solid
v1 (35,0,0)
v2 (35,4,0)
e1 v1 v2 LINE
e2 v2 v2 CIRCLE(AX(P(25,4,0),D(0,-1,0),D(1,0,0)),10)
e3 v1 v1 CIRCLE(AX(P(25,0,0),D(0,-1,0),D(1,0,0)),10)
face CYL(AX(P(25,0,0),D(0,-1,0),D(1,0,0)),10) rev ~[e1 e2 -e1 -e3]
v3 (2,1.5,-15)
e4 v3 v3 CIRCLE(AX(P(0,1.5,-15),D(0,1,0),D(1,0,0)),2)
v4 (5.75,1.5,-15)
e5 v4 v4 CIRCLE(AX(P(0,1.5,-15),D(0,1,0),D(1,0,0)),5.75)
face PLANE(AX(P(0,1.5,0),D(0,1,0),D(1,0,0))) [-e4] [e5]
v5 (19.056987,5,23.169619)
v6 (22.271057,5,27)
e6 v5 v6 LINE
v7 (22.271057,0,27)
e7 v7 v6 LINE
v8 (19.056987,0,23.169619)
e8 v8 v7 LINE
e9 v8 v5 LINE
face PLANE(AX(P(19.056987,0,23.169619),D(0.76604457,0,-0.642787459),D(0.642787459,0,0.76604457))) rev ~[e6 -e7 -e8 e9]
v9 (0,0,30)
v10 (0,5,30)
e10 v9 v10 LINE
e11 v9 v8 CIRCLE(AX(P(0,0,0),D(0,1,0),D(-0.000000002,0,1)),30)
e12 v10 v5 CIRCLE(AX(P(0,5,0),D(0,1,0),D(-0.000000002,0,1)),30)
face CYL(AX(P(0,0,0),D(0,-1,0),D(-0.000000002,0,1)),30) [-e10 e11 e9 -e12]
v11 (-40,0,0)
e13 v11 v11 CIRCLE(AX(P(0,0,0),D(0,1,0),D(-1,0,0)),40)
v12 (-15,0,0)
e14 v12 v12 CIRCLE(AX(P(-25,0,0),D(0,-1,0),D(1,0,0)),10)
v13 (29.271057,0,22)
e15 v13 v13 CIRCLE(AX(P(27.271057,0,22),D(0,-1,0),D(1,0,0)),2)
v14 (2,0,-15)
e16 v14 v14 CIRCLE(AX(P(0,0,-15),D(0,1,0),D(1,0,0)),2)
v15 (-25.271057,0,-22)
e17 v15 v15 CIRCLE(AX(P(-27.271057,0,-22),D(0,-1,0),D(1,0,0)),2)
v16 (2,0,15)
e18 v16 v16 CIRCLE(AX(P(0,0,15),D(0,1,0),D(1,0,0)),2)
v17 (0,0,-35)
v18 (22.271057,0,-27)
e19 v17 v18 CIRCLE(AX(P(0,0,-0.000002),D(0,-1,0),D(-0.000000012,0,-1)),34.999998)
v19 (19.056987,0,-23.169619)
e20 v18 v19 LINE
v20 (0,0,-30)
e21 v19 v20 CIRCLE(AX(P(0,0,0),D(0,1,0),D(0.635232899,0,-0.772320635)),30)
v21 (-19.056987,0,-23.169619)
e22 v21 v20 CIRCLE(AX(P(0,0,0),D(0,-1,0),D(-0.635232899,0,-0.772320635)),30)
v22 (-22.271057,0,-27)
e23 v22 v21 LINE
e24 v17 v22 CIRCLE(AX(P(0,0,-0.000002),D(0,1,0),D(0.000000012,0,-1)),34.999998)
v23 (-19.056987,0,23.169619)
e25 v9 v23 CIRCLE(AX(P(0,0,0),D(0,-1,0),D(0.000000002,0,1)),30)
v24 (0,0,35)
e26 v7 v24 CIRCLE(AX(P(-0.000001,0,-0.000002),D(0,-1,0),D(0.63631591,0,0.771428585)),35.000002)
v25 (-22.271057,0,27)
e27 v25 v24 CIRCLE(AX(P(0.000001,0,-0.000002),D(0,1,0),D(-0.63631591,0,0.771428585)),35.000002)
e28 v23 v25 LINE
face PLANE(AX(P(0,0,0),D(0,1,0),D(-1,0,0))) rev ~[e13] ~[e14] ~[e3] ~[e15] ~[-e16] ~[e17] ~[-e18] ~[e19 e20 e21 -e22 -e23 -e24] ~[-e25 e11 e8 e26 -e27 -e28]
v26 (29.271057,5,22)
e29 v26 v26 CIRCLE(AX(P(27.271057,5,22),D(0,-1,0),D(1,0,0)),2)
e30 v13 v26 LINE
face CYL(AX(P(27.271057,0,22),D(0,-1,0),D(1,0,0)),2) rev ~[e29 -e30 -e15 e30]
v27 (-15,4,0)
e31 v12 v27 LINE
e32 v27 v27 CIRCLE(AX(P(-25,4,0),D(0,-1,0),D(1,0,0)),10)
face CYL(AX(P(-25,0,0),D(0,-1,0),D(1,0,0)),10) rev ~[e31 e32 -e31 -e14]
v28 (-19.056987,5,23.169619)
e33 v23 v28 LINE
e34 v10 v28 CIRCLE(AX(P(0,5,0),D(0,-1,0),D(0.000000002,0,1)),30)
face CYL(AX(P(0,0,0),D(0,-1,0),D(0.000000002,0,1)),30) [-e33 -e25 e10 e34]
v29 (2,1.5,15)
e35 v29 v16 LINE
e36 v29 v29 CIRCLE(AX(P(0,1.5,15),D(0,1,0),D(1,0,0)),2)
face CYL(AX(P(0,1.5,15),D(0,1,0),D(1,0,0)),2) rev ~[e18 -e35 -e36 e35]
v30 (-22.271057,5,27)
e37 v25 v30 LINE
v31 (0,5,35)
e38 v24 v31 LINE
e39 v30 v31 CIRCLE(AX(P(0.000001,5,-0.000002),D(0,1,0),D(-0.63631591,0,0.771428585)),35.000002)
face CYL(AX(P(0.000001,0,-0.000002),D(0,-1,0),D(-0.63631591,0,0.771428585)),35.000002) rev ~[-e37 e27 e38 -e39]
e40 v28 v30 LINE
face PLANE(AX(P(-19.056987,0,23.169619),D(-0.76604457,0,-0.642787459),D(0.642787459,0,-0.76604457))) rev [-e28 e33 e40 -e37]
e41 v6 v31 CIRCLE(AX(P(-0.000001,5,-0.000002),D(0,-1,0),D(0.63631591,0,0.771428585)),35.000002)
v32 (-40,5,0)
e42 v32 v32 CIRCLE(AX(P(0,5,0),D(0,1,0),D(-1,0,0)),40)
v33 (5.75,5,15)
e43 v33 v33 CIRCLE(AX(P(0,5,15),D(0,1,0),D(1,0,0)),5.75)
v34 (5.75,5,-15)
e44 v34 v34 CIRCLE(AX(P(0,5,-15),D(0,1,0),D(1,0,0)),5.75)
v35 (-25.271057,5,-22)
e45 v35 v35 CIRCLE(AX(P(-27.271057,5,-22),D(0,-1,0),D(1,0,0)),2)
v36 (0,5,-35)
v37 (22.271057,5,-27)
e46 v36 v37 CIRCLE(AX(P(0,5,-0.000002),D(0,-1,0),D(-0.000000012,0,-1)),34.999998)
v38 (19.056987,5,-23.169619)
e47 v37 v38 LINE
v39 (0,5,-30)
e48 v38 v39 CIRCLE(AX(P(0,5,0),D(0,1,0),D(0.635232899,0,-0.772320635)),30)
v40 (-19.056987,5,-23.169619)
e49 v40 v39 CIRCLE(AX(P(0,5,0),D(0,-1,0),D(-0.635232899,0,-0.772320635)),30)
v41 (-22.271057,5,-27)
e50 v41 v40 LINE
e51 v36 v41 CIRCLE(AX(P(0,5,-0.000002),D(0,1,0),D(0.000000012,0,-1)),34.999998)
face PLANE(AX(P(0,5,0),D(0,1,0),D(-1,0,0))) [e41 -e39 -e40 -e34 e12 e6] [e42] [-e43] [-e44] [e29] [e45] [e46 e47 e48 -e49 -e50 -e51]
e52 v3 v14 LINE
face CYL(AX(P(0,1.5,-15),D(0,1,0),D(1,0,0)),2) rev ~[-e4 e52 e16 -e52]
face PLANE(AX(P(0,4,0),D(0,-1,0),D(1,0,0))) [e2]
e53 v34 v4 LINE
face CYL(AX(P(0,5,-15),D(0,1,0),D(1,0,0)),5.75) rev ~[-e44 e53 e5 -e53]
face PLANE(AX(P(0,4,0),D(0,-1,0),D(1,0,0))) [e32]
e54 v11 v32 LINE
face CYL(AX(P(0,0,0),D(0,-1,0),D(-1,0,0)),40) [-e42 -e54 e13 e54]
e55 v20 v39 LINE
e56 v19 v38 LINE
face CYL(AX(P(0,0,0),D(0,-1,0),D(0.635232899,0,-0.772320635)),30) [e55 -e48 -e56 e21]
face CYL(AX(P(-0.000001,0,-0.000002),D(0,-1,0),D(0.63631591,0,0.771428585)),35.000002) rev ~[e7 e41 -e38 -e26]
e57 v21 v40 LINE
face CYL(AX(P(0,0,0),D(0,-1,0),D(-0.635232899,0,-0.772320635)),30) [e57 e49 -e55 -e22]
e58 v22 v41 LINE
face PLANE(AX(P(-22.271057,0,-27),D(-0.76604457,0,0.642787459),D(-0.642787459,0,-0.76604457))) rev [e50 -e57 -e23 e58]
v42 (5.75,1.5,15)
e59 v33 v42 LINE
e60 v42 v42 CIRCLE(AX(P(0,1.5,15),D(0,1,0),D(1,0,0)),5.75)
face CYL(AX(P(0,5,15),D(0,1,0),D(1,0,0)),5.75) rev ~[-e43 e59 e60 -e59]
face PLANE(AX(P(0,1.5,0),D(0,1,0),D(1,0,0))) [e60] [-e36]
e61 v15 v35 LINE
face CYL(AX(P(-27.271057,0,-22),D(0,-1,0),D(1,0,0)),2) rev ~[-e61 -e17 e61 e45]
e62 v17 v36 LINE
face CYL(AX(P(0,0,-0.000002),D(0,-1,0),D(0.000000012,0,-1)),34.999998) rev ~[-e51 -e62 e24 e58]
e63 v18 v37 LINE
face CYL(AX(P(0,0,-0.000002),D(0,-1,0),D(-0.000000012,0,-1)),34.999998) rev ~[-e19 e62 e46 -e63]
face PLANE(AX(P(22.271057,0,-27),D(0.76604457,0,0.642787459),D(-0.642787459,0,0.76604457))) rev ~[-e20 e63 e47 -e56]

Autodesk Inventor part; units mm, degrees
ref_plane "YZ Plane" through (0, 0, 0) normal (1, 0, 0) x (0, 1, 0)
ref_plane "XZ Plane" through (0, 0, 0) normal (0, 1, 0) x (-1, 0, 0)
sketch "Sketch1" plane through (0, 0, 0) normal (0, 1, 0) x (-1, 0, 0)
  circle A0 centre (0, 0) radius 40
  dimension "d0" = 80
sketch "Sketch1 outline for Extrusion1" plane through (0, 0, 0) normal (0, 1, 0) x (-1, 0, 0)
  circle A0 centre (0, 0) radius 40
extrude "Extrusion1" add sketch "Sketch1 outline for Extrusion1" along normal blind 5
sketch "Sketch6" plane through (0, 0, 0) normal (0, -1, 0) x (1, 0, 0)
  line L0 (0, 0) -> (25, 0)
  circle A0 centre (25, 0) radius 10
  line L1 (0, 0) -> (-25, 0)
  line L2 (0, 0) -> (25, 0) construction
  circle A1 centre (-25, 0) radius 10
  dimension "d19" = 25
  dimension "d20" = 20
  dimension "d46" = 25
  dimension "d47" = 180
  dimension "d48" = 20
sketch "Sketch6 outline for Extrusion5" plane through (0, 0, 0) normal (0, -1, 0) x (1, 0, 0)
  circle A0 centre (25, 0) radius 10
  circle A1 centre (-25, 0) radius 10
extrude "Extrusion5" cut sketch "Sketch6 outline for Extrusion5" against normal blind 4
sketch "Sketch8" plane through (0, 0, 0) normal (0, -1, 0) x (1, 0, 0)
  circle A0 centre (0, 0) radius 40
  line L0 (21.650635, 27.5) -> (26.777009, 27.5) construction
  line L1 (0, 40) -> (0, 35)
  circle A1 centre (0, 0) radius 35
  line L2 (0, 35) -> (0, 30)
  circle A2 centre (0, 0) radius 30
  line L3 (0, 30) -> (26.457513, 30)
  line L4 (18.027756, 30) -> (15.52731, 25.669099)
  line L5 (18.027756, 30) -> (23.02865, 30) construction
  line L6 (-40, 0) -> (40, 0)
  line L7 (0, -30) -> (0, -40)
  line L8 (0, 30) -> (0, 27)
  line L9 (0, 27) -> (29.512709, 27)
  line L10 (22.271057, 27) -> (27.352779, 27) construction
  line L11 (22.271057, 27) -> (19.056987, 23.169619)
  line L12 (22.271057, 27) -> (27.271264, 27) construction
  line L13 (22.271057, -27) -> (19.056987, -23.169619)
  point P0 (0, -35)
  dimension "d53" = 5
  dimension "d54" = 5
  dimension "d55" = 120
  dimension "d58" = 3
  dimension "d60" = 130
sketch "Sketch8 outline for Extrusion7" plane through (0, 0, 0) normal (0, -1, 0) x (1, 0, 0)
  line L0 (22.271057, -27) -> (19.056987, -23.169619)
  arc A0 (0, -35) -> (22.271057, -27) centre (0, 0) ccw
  line L1 (0, -30) -> (0, -35)
  arc A1 (19.056987, -23.169619) -> (0, -30) centre (0, 0) cw
  line L2 (19.056987, 23.169619) -> (22.271057, 27)
  arc A2 (0, 30) -> (19.056987, 23.169619) centre (0, 0) cw
  line L3 (0, 35) -> (0, 30)
  arc A3 (22.271057, 27) -> (0, 35) centre (0, 0) ccw
extrude "Extrusion7" cut sketch "Sketch8 outline for Extrusion7" against normal up to surface (5 mm away)
ref_plane "Work Plane1" through (0, 0, -32.5) normal (1, 0, 0) x (0, 0, -1)
mirror "Mirror1" about plane through (0, 0, -32.5) normal (1, 0, 0) of "Extrusion7"
sketch "Sketch9" plane through (0, 5, 0) normal (0, 1, 0) x (1, 0, 0)
  circle A0 centre (25, 0) radius 10
  circle A1 centre (-25, 0) radius 10
  arc A2 (-19.056987, -23.169619) -> (19.056987, -23.169619) centre (0, 0) ccw
  line L0 (0, 0) -> (0, -30)
  line L1 (0, 0) -> (0, 30)
  arc A3 (19.056987, 23.169619) -> (-19.056987, 23.169619) centre (0, 0) ccw
  line L2 (0, 0) -> (0, -15)
  circle A4 centre (0, -15) radius 5.75
  line L3 (0, 0) -> (0, 15)
  circle A5 centre (0, 15) radius 5.75
  dimension "d61" = 15
  dimension "d62" = 11.5
  dimension "d63" = 15
  dimension "d64" = 11.5
sketch "Sketch9 outline for Extrusion8" plane through (0, 5, 0) normal (0, 1, 0) x (1, 0, 0)
  circle A0 centre (0, 15) radius 5.75
  circle A1 centre (0, -15) radius 5.75
extrude "Extrusion8" cut sketch "Sketch9 outline for Extrusion8" against normal blind 3.5
sketch "Sketch10" plane through (0, 1.5, 15) normal (0, 1, 0) x (1, 0, 0)
  circle A0 centre (0, 30) radius 5.75 projected
  circle A1 centre (0, 30) radius 2
  circle A2 centre (0, 0) radius 5.75 projected
  circle A3 centre (0, 0) radius 2
  point P0 (0, 15)
  dimension "d68" = 4
  dimension "d69" = 4
sketch "Sketch10 outline for Extrusion9" plane through (0, 1.5, 15) normal (0, 1, 0) x (1, 0, 0)
  circle A0 centre (0, 0) radius 2
  circle A1 centre (0, 30) radius 2
extrude "Extrusion9" cut sketch "Sketch10 outline for Extrusion9" against normal up to surface (1.5 mm away)
sketch "Sketch11" plane through (0, 0, 0) normal (0, -1, 0) x (1, 0, 0)
  line L0 (22.271057, 27) -> (19.056987, 23.169619)
  line L1 (22.271057, 27) -> (22.271057, 22)
  line L2 (22.271057, 22) -> (27.271057, 22)
  circle A0 centre (27.271057, 22) radius 2
  arc A1 (-22.271057, -27) -> (22.271057, -27) centre (0, 0) ccw
  line L3 (-22.271057, -27) -> (-22.271057, -22)
  line L4 (-22.271057, -22) -> (-27.271057, -22)
  circle A2 centre (-27.271057, -22) radius 2
  dimension "d72" = 5
  dimension "d73" = 5
  dimension "d74" = 4
  dimension "d75" = 5
  dimension "d76" = 5
  dimension "d77" = 4
sketch "Sketch11 outline for Extrusion10" plane through (0, 0, 0) normal (0, -1, 0) x (1, 0, 0)
  circle A0 centre (27.271057, 22) radius 2
  circle A1 centre (-27.271057, -22) radius 2
extrude "Extrusion10" cut sketch "Sketch11 outline for Extrusion10" against normal up to surface (5 mm away)
properties part number "Wrist_Coupling"
